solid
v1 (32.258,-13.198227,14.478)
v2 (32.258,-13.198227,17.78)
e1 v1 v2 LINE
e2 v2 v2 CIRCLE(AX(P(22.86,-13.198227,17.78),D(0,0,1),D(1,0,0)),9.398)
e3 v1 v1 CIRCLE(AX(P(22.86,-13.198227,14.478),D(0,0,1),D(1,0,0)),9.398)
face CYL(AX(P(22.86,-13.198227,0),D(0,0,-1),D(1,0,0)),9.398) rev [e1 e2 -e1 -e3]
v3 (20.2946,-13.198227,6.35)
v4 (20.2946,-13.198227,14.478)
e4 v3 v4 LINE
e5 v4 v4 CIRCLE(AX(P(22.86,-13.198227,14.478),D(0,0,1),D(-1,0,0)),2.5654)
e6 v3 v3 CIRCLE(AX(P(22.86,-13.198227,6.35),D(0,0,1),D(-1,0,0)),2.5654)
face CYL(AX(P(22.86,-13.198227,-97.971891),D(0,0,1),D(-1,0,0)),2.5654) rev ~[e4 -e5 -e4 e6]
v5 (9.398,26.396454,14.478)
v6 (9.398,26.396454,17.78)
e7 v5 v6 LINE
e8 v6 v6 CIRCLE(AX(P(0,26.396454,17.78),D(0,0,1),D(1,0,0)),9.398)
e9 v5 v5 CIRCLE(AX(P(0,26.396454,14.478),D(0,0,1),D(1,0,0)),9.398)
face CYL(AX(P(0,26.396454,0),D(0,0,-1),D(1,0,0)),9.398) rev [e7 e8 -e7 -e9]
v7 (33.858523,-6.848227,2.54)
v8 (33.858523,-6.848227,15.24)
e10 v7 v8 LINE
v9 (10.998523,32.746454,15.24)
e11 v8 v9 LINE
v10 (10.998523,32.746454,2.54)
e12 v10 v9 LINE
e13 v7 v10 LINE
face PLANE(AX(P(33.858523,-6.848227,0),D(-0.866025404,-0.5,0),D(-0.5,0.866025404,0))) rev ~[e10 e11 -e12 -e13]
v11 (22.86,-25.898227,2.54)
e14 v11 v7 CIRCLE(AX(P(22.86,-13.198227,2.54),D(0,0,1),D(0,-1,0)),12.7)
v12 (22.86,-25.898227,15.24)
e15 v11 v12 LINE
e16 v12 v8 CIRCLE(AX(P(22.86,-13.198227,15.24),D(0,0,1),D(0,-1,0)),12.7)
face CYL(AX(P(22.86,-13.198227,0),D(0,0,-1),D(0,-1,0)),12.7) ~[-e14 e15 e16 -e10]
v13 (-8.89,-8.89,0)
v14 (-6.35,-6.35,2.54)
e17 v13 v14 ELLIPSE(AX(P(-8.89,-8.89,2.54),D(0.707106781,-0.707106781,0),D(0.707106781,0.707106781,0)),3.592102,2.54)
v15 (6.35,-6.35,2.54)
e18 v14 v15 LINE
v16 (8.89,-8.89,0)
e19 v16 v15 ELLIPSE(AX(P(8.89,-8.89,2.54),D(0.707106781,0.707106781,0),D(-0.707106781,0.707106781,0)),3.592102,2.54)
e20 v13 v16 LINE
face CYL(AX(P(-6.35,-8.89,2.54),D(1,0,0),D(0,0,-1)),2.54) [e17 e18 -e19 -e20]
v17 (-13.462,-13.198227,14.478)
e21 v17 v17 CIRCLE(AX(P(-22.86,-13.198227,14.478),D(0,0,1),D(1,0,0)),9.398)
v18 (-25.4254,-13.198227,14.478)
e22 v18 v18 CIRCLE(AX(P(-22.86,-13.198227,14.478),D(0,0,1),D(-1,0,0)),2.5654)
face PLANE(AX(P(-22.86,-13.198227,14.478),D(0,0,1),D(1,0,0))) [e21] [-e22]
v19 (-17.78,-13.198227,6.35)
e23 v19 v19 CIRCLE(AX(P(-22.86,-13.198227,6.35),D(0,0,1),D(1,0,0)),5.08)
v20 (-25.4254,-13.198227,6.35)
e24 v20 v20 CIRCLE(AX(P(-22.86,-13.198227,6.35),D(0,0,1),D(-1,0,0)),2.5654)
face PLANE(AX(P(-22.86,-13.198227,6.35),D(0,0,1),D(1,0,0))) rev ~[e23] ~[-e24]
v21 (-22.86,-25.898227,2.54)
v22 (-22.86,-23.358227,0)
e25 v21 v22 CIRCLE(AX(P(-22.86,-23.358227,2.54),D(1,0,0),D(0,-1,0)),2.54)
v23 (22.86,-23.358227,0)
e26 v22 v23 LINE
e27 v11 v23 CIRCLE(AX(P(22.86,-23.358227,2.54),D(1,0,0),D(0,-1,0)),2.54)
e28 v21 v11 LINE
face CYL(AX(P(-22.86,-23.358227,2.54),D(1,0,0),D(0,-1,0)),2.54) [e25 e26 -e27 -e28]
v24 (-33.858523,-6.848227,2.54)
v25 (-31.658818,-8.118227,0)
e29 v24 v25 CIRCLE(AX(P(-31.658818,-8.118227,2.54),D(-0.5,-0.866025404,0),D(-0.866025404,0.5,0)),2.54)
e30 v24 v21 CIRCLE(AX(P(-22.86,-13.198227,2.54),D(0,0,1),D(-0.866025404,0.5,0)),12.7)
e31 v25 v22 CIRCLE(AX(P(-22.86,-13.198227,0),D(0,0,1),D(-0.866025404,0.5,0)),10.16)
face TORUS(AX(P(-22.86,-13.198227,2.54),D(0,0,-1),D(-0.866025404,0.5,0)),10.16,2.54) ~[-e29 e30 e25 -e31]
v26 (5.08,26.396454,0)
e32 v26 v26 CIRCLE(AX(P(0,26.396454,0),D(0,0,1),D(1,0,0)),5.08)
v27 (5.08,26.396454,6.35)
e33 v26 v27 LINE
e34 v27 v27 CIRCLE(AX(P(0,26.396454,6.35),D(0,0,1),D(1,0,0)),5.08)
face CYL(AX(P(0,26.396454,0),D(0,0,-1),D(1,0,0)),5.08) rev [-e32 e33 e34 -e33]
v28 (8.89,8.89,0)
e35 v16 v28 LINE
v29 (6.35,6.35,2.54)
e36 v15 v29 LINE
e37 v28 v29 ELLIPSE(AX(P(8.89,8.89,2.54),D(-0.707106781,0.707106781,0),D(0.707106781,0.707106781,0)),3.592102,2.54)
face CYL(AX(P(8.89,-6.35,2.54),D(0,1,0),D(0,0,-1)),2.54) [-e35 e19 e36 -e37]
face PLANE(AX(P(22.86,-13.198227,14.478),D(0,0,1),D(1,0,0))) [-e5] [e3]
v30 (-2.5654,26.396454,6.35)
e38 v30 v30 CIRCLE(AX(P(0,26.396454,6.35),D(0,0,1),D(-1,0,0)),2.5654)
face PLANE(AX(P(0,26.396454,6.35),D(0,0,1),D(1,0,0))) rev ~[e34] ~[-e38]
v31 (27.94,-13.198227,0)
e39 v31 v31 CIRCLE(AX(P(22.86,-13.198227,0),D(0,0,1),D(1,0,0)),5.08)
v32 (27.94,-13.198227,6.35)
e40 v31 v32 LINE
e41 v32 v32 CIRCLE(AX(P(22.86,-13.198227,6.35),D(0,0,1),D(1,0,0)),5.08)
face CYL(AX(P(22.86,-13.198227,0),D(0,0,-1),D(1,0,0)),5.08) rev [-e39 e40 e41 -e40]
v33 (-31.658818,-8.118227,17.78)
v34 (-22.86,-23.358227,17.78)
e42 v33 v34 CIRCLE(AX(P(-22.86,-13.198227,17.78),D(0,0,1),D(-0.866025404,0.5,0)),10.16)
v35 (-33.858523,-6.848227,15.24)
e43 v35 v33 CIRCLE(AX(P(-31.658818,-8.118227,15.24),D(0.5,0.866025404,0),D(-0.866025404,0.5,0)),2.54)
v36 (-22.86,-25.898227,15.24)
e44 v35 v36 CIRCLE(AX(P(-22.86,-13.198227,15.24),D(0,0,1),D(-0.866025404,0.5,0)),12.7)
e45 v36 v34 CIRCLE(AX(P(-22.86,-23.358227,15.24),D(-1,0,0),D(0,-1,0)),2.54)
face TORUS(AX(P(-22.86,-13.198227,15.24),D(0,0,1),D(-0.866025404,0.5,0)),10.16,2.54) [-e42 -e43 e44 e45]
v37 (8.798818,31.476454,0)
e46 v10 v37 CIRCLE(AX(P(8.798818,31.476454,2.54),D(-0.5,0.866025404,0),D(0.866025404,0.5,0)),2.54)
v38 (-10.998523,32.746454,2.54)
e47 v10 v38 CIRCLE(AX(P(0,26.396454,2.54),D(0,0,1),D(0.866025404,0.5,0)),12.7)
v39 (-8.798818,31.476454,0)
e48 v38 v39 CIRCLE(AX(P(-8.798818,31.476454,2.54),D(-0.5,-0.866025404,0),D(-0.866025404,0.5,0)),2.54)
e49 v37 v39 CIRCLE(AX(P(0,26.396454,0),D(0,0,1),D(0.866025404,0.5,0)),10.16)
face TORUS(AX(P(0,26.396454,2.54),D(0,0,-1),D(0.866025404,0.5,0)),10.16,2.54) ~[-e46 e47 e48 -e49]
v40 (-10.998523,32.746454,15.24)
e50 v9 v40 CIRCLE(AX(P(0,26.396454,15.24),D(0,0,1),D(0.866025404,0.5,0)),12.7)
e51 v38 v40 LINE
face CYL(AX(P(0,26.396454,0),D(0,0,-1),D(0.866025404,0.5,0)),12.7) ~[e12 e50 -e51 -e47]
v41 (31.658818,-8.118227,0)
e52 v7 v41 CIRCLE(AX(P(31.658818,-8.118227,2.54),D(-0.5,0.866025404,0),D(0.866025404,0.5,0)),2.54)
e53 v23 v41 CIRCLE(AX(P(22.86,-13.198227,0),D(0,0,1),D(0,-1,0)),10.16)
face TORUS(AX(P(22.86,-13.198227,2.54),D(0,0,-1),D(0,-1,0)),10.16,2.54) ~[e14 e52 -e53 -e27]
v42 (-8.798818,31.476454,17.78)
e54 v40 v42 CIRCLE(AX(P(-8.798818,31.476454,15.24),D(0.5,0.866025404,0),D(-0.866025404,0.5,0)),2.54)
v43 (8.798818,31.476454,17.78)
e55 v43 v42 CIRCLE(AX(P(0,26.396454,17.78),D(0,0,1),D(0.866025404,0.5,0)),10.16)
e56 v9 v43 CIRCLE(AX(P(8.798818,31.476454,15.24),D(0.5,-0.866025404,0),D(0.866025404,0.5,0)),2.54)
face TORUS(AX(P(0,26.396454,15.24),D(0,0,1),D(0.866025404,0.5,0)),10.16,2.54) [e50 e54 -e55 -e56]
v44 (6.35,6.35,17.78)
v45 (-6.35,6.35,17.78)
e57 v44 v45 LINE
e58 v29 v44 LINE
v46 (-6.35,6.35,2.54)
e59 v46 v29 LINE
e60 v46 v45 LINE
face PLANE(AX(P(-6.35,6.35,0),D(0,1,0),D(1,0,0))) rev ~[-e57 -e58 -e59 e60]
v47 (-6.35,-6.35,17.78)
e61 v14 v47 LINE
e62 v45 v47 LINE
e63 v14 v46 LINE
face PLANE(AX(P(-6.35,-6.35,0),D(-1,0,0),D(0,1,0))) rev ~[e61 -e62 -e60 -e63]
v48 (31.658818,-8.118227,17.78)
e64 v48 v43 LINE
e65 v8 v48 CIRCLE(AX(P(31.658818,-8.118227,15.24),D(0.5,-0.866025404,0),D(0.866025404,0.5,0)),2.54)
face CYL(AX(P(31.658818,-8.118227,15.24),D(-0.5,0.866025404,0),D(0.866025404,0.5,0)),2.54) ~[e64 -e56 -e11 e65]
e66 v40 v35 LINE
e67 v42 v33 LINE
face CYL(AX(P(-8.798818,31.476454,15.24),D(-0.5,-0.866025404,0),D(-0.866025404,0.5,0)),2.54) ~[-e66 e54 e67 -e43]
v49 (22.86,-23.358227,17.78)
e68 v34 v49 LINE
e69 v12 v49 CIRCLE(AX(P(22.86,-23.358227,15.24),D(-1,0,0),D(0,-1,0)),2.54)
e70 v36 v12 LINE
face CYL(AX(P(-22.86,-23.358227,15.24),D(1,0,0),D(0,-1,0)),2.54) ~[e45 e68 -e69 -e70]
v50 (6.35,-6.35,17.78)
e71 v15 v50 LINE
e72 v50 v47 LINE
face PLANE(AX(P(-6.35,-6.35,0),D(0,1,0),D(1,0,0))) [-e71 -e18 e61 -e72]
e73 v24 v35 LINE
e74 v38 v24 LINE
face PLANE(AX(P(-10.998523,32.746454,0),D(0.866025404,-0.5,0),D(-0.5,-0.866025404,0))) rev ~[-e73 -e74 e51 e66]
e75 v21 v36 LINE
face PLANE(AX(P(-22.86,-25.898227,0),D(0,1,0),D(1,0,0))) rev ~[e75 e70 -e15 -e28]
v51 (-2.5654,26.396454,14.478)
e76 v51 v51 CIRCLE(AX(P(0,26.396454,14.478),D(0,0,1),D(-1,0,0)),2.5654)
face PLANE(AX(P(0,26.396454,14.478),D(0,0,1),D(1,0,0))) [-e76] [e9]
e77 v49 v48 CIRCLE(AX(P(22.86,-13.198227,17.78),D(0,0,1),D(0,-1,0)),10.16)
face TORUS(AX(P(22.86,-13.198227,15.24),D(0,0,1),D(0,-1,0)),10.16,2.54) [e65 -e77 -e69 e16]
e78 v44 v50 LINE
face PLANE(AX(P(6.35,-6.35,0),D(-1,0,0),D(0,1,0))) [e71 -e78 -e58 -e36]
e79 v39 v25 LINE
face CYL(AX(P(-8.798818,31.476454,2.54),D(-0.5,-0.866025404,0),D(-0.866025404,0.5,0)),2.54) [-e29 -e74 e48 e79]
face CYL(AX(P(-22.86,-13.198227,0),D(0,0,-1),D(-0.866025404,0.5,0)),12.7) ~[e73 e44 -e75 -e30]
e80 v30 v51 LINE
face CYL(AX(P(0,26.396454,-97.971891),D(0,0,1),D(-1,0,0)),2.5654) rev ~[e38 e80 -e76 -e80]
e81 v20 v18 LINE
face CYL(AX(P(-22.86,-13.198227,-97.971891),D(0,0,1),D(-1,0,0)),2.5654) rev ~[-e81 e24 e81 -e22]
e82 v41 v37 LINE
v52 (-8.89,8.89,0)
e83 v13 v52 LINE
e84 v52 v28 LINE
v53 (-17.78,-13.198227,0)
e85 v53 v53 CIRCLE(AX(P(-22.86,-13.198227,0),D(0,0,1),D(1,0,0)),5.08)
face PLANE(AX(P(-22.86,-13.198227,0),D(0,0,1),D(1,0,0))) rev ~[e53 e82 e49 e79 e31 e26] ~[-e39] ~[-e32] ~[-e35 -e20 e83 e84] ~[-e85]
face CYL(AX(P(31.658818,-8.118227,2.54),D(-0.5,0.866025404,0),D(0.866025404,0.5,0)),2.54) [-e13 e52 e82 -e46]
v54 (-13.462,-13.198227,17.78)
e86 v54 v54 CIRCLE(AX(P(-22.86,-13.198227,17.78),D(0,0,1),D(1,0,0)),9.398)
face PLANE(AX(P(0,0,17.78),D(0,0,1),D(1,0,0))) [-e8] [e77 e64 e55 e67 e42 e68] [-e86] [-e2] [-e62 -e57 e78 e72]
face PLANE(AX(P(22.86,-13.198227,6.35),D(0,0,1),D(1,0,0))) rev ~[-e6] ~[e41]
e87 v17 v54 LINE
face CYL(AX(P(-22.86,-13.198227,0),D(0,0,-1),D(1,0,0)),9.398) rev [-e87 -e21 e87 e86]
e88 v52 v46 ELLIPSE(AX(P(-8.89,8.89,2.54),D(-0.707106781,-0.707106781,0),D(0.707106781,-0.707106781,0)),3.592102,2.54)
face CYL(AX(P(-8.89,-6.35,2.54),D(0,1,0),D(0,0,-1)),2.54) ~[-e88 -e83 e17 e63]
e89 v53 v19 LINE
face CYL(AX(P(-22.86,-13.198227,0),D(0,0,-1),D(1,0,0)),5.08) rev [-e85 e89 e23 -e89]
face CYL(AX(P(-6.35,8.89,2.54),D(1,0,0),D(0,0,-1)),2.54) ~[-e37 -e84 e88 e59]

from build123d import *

# Parameters (mm, degrees)
F0_R          = 9.398
F2_DEPTH      = 17.78
F3_DEPTH      = 14.478
F1_W          = 12.7
F1_H          = 12.7
F4_DEPTH      = 107
F4_DEPTH_BACK = 17.781
F5_D          = 5.1308
F6_R          = 2.54
F7_R          = 2.54
F8_R          = 2.54
F9_R          = 5.08
F10_DEPTH     = 6.35


# Not quite as in the source:
# - an extrude ends at something that could not be found from the text; its depth is read off the source's solid


with BuildPart() as f2:
    # F0 (on Top) → F2 (new body)
    with BuildSketch(Plane.XY):
        with BuildLine():
            ThreePointArc((10.9985226281, 32.7464543073), (0, 39.0964543073), (-10.9985226281, 32.7464543073))
            Line((-10.9985226281, 32.7464543073), (-33.8585226281, -6.8482271537))
            ThreePointArc((-33.8585226281, -6.8482271537), (-33.8585226281, -19.5482271537), (-22.86, -25.8982271537))
            Line((-22.86, -25.8982271537), (22.86, -25.8982271537))
            ThreePointArc((22.86, -25.8982271537), (33.8585226281, -19.5482271537), (33.8585226281, -6.8482271537))
            Line((33.8585226281, -6.8482271537), (10.9985226281, 32.7464543073))
        make_face()
        with Locations((-22.86, -13.1982271537)):
            Circle(F0_R, mode=Mode.SUBTRACT)
        with Locations((22.86, -13.1982271537)):
            Circle(F0_R, mode=Mode.SUBTRACT)
        with Locations((0, 26.3964543073)):
            Circle(F0_R, mode=Mode.SUBTRACT)
    extrude(amount=F2_DEPTH)

    # F0 (on Top) → F3 (join)
    with BuildSketch(Plane.XY):
        with Locations((-22.86, -13.1982271537)):
            Circle(F0_R)
        with Locations((22.86, -13.1982271537)):
            Circle(F0_R)
        with Locations((0, 26.3964543073)):
            Circle(F0_R)
    extrude(amount=F3_DEPTH)

    # F1 (on face) → F4 (cut, two sides)
    with BuildSketch(Plane.XY) as f4_sk:
        Rectangle(F1_W, F1_H)
    extrude(amount=-F4_DEPTH, mode=Mode.SUBTRACT)
    extrude(f4_sk.sketch, amount=F4_DEPTH_BACK, mode=Mode.SUBTRACT)

    # F5 (through all)
    with Locations(Plane(origin=(0, 0, 0), x_dir=(1, 0, 0), z_dir=(0, 0, -1))):
        with Locations((-22.86, 13.1982271537), (22.86, 13.1982271537), (0, -26.3964543073)):
            Hole(F5_D / 2)

    # F6
    f6_edges = [f2.edges().sort_by_distance(p)[0] for p in [
        (-22.428523, 12.949114, 17.78),
    ]]
    fillet(f6_edges, radius=F6_R)

    # F7
    f7_edges = [f2.edges().sort_by_distance(p)[0] for p in [
        (22.428523, 12.949114, 0),
    ]]
    fillet(f7_edges, radius=F7_R)

    # F8
    f8_edges = [f2.edges().sort_by_distance(p)[0] for p in [
        (6.35, 0, 0),
        (0, -6.35, 0),
        (0, 6.35, 0),
        (-6.35, 0, 0),
    ]]
    fillet(f8_edges, radius=F8_R)

    # F9 (on face) → F10 (cut)
    with BuildSketch(Plane.XY):
        with Locations((22.86, -13.1982271537)):
            Circle(F9_R)
        with Locations((0, 26.3964543073)):
            Circle(F9_R)
        with Locations((-22.86, -13.1982271537)):
            Circle(F9_R)
    extrude(amount=F10_DEPTH, mode=Mode.SUBTRACT)


solid = f2.part
